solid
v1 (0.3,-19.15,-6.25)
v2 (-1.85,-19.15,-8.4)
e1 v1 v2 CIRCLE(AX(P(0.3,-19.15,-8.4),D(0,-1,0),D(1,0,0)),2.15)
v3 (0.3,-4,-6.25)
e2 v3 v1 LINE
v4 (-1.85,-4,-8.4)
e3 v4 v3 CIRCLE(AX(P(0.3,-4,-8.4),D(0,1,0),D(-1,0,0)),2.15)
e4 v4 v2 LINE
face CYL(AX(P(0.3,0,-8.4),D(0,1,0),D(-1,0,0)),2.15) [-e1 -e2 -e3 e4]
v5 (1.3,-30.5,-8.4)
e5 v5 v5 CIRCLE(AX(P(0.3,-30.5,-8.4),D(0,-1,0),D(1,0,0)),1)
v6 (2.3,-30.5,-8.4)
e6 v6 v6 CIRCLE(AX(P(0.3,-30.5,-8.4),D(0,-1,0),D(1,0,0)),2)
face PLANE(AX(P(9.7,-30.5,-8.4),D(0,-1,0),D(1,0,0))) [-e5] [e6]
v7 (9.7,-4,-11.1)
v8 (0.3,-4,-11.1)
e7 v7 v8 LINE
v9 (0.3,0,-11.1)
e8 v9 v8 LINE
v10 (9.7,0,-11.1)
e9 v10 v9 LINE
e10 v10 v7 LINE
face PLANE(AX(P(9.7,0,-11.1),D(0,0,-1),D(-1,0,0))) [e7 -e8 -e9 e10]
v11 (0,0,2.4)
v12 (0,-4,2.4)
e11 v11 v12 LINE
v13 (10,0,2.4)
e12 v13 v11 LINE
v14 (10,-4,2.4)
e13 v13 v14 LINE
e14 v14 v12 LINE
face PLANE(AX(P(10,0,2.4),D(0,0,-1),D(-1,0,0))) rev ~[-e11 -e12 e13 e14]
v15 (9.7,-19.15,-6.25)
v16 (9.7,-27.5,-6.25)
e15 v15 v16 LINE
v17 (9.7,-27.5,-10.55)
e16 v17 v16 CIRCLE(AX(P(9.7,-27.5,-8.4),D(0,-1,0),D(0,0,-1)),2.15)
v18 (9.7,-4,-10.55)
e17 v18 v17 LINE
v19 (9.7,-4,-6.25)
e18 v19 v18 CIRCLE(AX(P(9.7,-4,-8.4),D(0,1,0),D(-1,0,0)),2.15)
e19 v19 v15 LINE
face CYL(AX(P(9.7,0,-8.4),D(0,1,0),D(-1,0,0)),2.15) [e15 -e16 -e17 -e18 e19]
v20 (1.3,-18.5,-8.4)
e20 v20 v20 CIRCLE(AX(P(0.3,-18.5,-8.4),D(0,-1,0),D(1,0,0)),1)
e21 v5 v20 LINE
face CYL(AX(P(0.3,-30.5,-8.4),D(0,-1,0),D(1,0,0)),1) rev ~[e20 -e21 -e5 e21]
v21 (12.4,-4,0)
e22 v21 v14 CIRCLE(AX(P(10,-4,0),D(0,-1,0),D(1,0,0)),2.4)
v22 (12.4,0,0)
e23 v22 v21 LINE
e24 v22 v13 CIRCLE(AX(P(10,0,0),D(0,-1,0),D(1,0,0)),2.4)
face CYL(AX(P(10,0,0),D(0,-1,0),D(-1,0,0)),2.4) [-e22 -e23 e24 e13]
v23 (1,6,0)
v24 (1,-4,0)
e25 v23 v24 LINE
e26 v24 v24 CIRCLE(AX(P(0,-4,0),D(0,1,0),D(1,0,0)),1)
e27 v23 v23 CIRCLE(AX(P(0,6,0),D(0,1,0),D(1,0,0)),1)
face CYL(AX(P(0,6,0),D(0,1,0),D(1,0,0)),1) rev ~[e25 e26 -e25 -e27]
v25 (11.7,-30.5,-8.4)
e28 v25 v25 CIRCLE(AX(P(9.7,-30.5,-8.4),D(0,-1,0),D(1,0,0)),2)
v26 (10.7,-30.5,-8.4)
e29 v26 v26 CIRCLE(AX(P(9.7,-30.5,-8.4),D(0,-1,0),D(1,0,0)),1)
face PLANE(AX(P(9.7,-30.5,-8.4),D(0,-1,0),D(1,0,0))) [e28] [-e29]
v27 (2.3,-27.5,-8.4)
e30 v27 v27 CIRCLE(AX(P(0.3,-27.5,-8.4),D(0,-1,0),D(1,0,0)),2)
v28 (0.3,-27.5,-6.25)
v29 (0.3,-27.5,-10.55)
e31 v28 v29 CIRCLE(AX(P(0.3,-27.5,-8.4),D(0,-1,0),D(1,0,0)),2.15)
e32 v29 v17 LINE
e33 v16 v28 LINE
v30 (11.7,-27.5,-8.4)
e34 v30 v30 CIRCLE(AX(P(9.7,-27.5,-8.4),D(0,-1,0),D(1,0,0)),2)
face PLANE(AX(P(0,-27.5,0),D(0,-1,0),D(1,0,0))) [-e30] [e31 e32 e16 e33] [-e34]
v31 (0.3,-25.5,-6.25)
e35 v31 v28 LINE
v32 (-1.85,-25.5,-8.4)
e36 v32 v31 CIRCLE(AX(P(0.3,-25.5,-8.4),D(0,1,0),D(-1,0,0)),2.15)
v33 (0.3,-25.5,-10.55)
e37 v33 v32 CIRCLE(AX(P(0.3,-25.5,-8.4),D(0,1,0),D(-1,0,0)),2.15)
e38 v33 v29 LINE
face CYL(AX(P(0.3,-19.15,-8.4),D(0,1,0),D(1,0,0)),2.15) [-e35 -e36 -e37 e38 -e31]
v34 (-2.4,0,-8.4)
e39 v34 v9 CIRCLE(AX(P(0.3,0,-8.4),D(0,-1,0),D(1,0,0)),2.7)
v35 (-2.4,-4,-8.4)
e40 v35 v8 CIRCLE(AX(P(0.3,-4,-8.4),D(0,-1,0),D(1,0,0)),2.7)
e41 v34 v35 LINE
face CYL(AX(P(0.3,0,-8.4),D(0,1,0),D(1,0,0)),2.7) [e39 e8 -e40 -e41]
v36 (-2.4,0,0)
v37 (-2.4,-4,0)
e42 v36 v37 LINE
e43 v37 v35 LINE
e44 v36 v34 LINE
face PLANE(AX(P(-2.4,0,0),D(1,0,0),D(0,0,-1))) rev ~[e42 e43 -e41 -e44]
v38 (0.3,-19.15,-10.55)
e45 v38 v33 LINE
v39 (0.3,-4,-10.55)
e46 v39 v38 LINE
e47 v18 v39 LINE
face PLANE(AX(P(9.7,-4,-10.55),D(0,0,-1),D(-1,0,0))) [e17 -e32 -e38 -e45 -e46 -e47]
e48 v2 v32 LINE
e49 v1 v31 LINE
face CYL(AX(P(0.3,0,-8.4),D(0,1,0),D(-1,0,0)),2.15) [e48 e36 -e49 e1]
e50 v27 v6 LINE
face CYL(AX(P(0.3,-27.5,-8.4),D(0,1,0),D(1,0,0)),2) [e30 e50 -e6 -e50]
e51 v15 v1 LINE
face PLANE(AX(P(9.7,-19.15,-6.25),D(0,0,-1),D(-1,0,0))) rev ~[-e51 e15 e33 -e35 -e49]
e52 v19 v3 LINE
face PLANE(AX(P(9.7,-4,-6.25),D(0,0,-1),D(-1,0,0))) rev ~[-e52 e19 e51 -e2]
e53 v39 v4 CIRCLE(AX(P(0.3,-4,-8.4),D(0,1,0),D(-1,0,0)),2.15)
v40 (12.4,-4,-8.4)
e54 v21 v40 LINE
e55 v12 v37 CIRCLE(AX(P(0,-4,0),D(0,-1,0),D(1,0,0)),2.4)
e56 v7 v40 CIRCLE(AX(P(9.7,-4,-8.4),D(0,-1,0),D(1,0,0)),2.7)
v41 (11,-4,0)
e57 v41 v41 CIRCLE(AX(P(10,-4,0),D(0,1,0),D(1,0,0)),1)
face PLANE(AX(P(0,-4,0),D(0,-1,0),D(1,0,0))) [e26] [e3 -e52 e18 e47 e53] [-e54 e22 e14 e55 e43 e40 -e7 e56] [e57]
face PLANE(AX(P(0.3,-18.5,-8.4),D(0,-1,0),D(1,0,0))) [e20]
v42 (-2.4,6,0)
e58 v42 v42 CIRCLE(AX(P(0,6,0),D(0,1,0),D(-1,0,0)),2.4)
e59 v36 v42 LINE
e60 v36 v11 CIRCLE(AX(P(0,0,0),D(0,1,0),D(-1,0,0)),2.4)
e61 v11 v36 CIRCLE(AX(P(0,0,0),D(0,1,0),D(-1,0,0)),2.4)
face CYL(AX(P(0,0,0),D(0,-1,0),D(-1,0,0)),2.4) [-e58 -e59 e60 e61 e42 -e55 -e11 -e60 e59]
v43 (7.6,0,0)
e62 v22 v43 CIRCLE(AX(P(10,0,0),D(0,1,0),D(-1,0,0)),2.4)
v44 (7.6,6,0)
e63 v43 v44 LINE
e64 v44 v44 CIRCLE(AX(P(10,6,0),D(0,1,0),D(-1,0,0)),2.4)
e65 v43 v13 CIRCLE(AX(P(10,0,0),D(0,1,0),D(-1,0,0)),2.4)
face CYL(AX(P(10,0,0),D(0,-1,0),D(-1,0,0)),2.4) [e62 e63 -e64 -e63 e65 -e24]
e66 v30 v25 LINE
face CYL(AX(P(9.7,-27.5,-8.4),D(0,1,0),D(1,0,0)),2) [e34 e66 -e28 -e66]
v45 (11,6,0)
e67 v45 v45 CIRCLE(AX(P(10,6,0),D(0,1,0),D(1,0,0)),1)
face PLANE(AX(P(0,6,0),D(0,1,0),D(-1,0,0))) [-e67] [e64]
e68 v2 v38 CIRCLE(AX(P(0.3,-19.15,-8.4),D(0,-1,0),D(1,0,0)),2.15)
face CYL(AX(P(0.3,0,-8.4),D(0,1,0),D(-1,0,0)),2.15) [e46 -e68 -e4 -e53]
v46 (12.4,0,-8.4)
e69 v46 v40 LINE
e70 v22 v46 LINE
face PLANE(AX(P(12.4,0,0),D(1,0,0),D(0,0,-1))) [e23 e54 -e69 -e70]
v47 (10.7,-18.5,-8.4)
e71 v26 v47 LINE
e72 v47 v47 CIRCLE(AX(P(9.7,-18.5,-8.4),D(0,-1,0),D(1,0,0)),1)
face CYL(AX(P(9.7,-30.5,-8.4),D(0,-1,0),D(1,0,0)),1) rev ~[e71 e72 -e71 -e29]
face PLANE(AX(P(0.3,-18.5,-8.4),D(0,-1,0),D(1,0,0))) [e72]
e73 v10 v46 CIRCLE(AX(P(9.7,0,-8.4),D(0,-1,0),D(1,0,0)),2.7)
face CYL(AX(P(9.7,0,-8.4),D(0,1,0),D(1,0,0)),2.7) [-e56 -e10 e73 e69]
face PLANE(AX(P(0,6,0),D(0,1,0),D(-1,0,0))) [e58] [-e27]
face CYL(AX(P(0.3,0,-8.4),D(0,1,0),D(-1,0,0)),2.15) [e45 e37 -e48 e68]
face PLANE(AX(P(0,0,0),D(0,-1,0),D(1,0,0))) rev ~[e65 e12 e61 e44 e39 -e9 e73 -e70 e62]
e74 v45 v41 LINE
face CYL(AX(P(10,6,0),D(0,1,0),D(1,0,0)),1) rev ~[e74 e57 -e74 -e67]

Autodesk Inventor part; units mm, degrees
ref_plane "YZ Plane" through (0, 0, 0) normal (1, 0, 0) x (0, 1, 0)
ref_plane "XZ Plane" through (0, 0, 0) normal (0, 1, 0) x (-1, 0, 0)
ref_plane "XY Plane" through (0, 0, 0) normal (0, 0, 1) x (1, 0, 0)
sketch "Sketch1" plane through (0, 0, 0) normal (0, 1, 0) x (-1, 0, 0)
  circle A0 centre (0, 0) radius 2.4
  circle A1 centre (-0.3, -8.4) radius 2.15
  circle A2 centre (-10, 0) radius 2.4
  circle A3 centre (-9.7, -8.4) radius 2.15
  dimension "d0" = 4.8
  dimension "d1" = 4.3
  dimension "d3" = 4.8
  dimension "d4" = 10
  dimension "d5" = 4.3
  dimension "d33" = 0.3
  dimension "d34" = 0.3
extrude "Extrusion1" add sketch "Sketch1" along normal blind 6 contours A0 | A2
sketch "Sketch3" plane through (0, 0, 0) normal (0, -1, 0) x (1, 0, 0)
  circle A0 centre (10, 0) radius 2.4 projected
  line L0 (10, 2.4) -> (0, 2.4)
  line L1 (12.4, 0) -> (12.4, -8.4)
  circle A1 centre (0, 0) radius 2.4 projected
  line L2 (-2.4, 0) -> (-2.4, -8.4)
  circle A2 centre (9.7, -8.4) radius 2.15 projected
  circle A3 centre (0.3, -8.4) radius 2.15 projected
  circle A4 centre (0.3, -8.4) radius 2.7
  circle A5 centre (9.7, -8.4) radius 2.7
  line L3 (9.7, -11.1) -> (0.3, -11.1)
  dimension "d12" = 8.4
  dimension "d13" = 8.4
extrude "Extrusion3" add sketch "Sketch3" along normal blind 4 contours A0 | L1 A5 L3 A4 L2 A1 L0 A0 | A5 | A1 | A4 | A2 | A3
extrude "Extrusion4" add sketch "Sketch1" against normal blind 25.5 contours A1 | A3
sketch "Sketch4" plane through (0, -4, 0) normal (0, -1, 0) x (1, 0, 0)
  circle A0 centre (9.7, -8.4) radius 2.15 projected
  line L0 (9.7, -6.25) -> (-0.3, -6.25)
  line L1 (9.7, -10.55) -> (0.3, -10.55)
  circle A1 centre (0.3, -8.4) radius 2.15 projected
  point P0 (0, 0)
  point P1 (0.3, -6.25)
extrude "Extrusion5" add sketch "Sketch4" along normal blind 15.15 contours A0 L1 A1 L0
sketch "Sketch6" plane through (0.3, -25.5, -8.4) normal (0, -1, 0) x (1, 0, 0)
  circle A0 centre (0, 0) radius 1.5 projected
  point P0 (-0.3, 8.4)
  point P1 (-5.35, -0.0027)
  dimension "d24" = 5.35
sketch "Sketch7" plane through (9.7, -25.5, -8.4) normal (0, -1, 0) x (1, 0, 0)
  circle A0 centre (0, 0) radius 2.15 projected
  circle A1 centre (0, 0) radius 2
  arc A2 (-9.4, 2.15) -> (-9.4, -2.15) centre (-9.4, 0) ccw projected
  circle A3 centre (-9.4, 0) radius 2
  point P0 (-9.7, 8.4)
  dimension "d25" = 4
  dimension "d26" = 4
extrude "Extrusion7" add sketch "Sketch7" along normal blind 2 contours A1 | A3
sketch "Sketch8" plane through (0.3, -27.5, -8.4) normal (0, -1, 0) x (1, 0, 0)
  circle A0 centre (0, 0) radius 1.5
  circle A1 centre (9.4, 0) radius 2 projected
  circle A2 centre (9.4, 0) radius 1.5
  point P0 (-0.3, 8.4)
  dimension "d29" = 3
  dimension "d30" = 3
extrude "Extrusion8" cut sketch "Sketch8" against normal blind 6 contours A0 | A2
sketch "Sketch10" plane through (0, -19.15, 0) normal (0, -1, 0) x (1, 0, 0)
  circle A0 centre (0.3, -8.4) radius 2 projected
  line L0 (0.3, -10.55) -> (9.7, -10.55) projected
  arc A1 (9.7, -6.25) -> (9.7, -10.55) centre (9.7, -8.4) ccw projected
  line L1 (9.7, -6.25) -> (0.3, -6.25) projected
  arc A2 (0.3, -10.55) -> (0.3, -6.25) centre (0.3, -8.4) ccw projected
  circle A3 centre (0.3, -8.4) radius 2.15 projected
  circle A4 centre (9.7, -8.4) radius 2.15 projected
  circle A5 centre (9.7, -8.4) radius 2 projected
  point P0 (0, 0)
extrude "Extrusion9" add sketch "Sketch10" along normal up to surface (8.35 mm away) contours A0 | A2 L1 A1 L0 | A3 A2 | A1 A4 | A5
sketch "Sketch11" plane through (9.7, -27.5, -8.4) normal (0, -1, 0) x (1, 0, 0)
  arc A0 (-9.4, 2.15) -> (-9.4, -2.15) centre (-9.4, 0) ccw projected
  circle A1 centre (-9.4, 0) radius 2
  arc A2 (0, -2.15) -> (0, 2.15) centre (0, 0) ccw projected
  circle A3 centre (0, 0) radius 2
  point P0 (-9.7, 8.4)
  dimension "d37" = 4
  dimension "d38" = 4
extrude "Extrusion10" add sketch "Sketch11" along normal blind 3
sketch "Sketch12" plane through (0.3, -30.5, -8.4) normal (0, -1, 0) x (1, 0, 0)
  circle A0 centre (0, 0) radius 2 projected
  circle A1 centre (9.4, 0) radius 2 projected
  circle A2 centre (0, 0) radius 1
  circle A3 centre (9.4, 0) radius 1
  point P0 (-0.3, 8.4)
  dimension "d41" = 2
  dimension "d42" = 2
extrude "Extrusion11" cut sketch "Sketch12" against normal blind 12 contours A2 | A3
sketch "Sketch13" plane through (10, 6, 0) normal (0, 1, 0) x (1, 0, 0)
  circle A0 centre (0, 0) radius 2.4 projected
  circle A1 centre (-10, 0) radius 2.4 projected
  circle A2 centre (0, 0) radius 1
  circle A3 centre (-10, 0) radius 1
  dimension "d45" = 2
  dimension "d46" = 2
extrude "Extrusion12" cut sketch "Sketch13" against normal blind 12 contours A2 | A3
properties part number "gripper3leftsideservobracket_3DPrint"
